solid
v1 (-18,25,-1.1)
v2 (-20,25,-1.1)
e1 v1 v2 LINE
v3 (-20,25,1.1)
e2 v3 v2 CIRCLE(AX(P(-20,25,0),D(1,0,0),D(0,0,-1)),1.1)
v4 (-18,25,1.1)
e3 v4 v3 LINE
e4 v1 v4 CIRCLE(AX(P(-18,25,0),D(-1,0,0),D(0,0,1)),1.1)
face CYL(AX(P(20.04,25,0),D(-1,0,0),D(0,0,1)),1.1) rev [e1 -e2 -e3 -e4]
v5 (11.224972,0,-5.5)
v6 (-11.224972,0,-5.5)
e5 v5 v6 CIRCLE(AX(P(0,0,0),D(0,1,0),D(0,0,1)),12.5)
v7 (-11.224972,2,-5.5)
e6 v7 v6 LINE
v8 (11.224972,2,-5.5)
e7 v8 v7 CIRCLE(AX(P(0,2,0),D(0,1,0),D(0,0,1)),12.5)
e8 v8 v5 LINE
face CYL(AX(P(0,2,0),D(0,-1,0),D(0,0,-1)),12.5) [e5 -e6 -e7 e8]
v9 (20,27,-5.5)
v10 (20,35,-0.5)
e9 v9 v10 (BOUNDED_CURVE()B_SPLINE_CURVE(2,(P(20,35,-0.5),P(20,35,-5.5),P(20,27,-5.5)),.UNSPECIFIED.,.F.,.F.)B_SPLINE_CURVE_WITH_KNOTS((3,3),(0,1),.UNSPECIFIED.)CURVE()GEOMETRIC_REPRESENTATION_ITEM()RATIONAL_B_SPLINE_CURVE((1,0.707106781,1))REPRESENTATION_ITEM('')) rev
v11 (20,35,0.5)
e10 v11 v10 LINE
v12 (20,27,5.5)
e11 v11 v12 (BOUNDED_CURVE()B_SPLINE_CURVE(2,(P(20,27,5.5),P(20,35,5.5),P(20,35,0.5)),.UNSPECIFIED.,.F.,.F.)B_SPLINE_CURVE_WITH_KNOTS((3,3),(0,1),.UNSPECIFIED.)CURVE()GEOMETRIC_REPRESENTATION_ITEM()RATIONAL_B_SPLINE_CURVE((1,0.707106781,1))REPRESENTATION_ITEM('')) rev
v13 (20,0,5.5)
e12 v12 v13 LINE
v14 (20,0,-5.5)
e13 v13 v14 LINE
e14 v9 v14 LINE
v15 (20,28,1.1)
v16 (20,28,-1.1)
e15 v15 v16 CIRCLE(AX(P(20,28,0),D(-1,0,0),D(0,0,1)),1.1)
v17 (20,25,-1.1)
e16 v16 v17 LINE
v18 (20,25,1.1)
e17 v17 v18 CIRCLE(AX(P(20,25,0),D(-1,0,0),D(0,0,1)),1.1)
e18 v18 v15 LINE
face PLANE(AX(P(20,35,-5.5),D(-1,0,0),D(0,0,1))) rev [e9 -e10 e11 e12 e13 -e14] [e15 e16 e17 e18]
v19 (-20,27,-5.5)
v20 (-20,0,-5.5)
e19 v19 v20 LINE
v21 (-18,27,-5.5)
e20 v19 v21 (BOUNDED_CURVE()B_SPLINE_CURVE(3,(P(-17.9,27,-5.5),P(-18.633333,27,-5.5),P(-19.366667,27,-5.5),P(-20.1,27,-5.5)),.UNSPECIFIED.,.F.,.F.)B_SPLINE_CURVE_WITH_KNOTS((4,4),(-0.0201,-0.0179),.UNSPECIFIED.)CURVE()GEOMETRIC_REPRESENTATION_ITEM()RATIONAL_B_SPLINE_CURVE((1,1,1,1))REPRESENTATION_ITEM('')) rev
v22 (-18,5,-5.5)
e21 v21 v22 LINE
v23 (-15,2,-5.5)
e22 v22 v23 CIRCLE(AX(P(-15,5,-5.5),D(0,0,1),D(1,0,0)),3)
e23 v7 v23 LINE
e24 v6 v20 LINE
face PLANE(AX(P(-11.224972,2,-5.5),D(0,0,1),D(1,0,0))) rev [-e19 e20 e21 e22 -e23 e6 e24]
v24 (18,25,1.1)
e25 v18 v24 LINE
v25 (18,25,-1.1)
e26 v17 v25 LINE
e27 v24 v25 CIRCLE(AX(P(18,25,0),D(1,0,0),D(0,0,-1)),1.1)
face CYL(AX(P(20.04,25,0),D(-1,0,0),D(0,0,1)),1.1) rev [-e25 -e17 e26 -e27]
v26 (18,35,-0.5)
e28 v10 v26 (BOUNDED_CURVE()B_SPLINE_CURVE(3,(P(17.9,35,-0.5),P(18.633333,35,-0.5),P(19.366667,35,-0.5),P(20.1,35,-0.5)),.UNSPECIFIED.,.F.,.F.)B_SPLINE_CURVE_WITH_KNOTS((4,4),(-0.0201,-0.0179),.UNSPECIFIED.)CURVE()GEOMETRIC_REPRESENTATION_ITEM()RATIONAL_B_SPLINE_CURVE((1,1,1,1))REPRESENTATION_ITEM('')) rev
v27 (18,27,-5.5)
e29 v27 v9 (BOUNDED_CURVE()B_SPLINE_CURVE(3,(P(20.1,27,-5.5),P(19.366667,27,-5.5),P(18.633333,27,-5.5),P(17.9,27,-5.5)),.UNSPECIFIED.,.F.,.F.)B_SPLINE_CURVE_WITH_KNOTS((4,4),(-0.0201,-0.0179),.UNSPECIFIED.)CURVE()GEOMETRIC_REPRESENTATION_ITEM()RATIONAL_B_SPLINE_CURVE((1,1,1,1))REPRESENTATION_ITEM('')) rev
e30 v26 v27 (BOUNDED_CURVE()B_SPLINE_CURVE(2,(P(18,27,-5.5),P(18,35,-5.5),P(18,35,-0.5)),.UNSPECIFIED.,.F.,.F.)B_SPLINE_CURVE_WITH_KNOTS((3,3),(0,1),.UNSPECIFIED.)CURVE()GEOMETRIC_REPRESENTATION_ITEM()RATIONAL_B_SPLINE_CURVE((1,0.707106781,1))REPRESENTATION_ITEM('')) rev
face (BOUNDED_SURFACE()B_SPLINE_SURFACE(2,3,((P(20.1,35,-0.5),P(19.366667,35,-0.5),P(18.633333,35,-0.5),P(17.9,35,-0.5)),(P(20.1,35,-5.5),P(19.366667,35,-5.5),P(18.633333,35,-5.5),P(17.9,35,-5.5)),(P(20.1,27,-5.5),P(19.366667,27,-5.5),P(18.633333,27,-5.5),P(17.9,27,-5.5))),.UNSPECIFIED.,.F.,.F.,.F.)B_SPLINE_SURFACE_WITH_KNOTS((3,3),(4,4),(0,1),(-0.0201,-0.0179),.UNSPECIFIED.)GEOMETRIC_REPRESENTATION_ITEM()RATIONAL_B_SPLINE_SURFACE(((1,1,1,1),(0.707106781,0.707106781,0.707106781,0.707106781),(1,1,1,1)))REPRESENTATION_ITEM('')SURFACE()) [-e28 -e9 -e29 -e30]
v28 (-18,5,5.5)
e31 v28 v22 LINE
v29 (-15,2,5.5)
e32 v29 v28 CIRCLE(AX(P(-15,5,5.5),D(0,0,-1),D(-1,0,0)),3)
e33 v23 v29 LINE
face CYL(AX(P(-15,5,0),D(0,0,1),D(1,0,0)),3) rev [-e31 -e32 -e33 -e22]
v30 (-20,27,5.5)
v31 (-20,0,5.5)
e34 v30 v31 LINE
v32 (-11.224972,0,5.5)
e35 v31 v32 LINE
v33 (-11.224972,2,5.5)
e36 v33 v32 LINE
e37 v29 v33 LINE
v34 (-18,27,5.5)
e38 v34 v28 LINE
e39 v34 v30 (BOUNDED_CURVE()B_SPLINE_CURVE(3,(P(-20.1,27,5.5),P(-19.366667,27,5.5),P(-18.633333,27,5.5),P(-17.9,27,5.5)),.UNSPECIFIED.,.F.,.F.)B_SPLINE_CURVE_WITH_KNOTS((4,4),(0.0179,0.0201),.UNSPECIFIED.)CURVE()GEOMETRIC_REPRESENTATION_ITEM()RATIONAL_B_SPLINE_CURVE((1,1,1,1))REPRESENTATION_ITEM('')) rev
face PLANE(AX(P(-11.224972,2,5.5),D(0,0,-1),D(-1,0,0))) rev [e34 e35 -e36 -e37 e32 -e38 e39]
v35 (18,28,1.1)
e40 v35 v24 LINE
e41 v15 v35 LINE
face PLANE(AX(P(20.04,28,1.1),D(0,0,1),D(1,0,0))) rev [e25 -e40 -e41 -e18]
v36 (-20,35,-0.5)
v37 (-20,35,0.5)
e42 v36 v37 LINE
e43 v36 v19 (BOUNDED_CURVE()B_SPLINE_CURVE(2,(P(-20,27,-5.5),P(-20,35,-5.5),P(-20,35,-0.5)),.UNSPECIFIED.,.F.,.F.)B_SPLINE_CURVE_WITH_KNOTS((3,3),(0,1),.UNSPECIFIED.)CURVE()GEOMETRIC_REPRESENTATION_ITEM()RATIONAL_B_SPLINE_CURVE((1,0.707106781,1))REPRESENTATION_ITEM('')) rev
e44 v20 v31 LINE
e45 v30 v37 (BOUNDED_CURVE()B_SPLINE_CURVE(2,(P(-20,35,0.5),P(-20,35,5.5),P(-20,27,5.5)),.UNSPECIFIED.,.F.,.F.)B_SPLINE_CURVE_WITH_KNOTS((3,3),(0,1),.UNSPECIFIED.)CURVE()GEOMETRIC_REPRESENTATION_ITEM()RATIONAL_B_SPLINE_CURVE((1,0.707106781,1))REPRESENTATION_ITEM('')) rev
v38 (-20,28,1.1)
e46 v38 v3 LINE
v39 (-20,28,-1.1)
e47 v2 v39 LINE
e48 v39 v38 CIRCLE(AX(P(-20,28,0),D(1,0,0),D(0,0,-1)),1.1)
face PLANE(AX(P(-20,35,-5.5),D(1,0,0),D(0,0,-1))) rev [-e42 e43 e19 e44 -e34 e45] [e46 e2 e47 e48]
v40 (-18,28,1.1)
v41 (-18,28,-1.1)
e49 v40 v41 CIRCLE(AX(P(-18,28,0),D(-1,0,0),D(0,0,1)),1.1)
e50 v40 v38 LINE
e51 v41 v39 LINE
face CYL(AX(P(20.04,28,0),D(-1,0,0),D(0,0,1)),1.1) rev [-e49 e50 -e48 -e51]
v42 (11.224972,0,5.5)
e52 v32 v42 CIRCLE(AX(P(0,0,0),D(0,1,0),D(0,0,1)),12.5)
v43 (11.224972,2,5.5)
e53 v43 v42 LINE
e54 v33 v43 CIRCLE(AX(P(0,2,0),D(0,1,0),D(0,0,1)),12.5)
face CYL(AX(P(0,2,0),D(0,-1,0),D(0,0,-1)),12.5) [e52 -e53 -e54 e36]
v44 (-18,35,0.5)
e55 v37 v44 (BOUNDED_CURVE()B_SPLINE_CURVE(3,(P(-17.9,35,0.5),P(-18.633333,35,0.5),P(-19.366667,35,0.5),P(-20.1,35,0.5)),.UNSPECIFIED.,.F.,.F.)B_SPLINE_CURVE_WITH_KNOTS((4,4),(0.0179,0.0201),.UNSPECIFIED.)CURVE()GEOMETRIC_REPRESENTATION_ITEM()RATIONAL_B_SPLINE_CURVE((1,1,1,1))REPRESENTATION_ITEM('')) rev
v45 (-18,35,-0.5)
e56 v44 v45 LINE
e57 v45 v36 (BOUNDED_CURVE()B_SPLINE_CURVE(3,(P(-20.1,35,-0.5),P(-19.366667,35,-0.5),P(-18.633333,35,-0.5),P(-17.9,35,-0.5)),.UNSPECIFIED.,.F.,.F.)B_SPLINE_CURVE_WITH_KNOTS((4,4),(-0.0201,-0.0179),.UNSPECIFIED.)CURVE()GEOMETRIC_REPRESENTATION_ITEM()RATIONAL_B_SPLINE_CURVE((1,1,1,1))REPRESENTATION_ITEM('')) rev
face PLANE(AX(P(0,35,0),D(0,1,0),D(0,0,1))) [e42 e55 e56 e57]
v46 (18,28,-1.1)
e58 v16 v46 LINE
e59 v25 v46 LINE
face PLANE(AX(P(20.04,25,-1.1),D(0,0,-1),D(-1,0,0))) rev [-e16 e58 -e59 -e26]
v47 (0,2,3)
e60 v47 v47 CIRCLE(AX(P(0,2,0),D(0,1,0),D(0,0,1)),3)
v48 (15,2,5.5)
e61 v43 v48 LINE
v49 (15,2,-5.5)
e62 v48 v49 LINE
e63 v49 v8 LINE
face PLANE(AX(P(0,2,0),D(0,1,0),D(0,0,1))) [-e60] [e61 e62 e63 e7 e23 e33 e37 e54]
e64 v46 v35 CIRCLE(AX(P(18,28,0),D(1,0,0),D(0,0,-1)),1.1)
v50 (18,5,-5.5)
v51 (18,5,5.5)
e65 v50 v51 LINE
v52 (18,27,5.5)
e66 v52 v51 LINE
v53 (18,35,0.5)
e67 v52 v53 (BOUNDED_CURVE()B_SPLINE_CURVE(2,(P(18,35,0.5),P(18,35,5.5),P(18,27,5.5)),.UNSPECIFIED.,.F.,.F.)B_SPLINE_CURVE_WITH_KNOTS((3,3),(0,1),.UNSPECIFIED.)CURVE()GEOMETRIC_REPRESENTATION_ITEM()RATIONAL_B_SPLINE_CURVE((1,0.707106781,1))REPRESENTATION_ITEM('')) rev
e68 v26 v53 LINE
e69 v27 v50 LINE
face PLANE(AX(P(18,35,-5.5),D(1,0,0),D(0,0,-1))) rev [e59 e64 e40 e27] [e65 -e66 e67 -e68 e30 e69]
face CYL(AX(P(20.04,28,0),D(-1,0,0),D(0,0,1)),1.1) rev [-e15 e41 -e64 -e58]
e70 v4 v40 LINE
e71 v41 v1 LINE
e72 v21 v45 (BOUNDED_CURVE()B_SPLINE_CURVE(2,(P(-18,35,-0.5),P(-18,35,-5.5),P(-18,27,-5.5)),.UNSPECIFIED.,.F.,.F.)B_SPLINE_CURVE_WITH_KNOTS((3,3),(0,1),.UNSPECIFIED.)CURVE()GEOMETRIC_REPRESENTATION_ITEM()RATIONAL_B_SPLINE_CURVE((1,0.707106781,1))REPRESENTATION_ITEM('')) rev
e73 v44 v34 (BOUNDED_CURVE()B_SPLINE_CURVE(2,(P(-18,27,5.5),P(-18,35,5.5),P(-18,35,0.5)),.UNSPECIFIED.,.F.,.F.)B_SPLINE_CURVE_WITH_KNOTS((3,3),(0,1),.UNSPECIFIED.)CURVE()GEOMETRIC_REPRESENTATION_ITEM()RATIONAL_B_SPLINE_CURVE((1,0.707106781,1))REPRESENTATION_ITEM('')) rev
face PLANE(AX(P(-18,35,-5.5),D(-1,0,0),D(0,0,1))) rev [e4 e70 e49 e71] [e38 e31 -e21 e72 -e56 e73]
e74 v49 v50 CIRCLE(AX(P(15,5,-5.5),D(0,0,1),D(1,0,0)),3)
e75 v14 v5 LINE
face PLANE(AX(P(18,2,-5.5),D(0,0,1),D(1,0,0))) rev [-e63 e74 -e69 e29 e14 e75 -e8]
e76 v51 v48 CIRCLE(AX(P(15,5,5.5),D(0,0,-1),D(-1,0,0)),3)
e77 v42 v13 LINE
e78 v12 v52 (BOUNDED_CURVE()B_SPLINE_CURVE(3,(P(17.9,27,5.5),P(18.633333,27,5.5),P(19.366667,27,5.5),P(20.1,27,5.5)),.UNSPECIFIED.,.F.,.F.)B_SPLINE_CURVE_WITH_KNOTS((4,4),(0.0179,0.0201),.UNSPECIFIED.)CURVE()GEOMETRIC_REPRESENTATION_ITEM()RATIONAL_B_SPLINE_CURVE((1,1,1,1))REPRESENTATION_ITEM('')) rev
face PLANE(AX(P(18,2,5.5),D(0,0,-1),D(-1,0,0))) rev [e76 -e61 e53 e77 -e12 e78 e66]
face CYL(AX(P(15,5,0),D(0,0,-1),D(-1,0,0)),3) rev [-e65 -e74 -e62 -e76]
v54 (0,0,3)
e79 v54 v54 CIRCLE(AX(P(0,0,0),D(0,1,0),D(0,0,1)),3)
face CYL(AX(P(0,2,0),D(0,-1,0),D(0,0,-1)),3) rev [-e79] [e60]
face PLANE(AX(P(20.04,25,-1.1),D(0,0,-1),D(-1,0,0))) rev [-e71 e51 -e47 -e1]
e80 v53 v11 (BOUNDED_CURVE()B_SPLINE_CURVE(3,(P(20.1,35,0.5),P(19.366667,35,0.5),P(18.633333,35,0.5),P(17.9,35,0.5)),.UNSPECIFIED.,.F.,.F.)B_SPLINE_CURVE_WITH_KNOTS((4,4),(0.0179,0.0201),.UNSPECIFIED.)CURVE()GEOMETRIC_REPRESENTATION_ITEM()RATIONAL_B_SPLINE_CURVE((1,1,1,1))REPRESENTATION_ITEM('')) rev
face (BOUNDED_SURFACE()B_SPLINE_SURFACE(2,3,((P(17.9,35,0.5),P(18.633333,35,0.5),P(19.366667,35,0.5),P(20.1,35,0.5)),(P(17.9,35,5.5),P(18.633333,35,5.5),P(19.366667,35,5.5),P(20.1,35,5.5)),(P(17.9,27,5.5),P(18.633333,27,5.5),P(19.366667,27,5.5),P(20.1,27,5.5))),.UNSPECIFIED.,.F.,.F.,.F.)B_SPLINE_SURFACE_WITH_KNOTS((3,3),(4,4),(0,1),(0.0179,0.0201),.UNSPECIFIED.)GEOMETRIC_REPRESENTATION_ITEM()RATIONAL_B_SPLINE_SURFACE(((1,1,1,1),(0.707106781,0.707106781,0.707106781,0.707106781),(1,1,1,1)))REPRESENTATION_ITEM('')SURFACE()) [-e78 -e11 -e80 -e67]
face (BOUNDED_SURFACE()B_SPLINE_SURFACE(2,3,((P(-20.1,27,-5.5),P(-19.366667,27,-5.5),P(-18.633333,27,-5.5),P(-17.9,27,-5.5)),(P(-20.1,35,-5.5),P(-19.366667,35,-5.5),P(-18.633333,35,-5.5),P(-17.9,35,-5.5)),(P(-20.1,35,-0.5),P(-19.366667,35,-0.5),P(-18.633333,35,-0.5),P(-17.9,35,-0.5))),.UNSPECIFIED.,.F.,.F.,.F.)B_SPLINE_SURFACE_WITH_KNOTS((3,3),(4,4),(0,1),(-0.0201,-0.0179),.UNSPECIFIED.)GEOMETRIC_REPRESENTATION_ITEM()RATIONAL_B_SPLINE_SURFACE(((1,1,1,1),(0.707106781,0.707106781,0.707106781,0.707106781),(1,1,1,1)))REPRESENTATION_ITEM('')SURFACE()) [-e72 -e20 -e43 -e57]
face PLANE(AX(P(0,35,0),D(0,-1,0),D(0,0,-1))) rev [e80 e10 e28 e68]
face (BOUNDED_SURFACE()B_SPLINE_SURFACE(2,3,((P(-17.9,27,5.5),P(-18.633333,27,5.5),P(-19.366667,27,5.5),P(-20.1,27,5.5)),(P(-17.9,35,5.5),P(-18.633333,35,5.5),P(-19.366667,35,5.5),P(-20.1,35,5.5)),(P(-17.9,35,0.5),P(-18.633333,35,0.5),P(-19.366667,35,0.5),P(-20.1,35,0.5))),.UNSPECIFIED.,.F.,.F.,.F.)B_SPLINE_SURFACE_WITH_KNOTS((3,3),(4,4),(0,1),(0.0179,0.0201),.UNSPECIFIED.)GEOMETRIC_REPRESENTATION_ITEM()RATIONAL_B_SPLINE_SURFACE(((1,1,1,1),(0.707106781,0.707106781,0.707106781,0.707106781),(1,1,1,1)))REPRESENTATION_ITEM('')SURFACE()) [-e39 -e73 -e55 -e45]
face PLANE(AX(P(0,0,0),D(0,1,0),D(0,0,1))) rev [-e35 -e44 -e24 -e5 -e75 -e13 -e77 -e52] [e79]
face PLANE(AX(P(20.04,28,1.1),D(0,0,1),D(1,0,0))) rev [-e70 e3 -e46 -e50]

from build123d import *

# Parameters (mm, degrees)
SKETCH_1_R               = 3
EXTRUDE_1_DEPTH          = 2
SKETCH_2_W               = 2
SKETCH_2_H               = 11
EXTRUDE_2_DEPTH          = 35
FILLET_1_SIZE            = 8
FILLET_1_SIZE_2          = 5
CUT_EXTRUDE_1_DEPTH      = 55.600824307
CUT_EXTRUDE_1_DEPTH_BACK = 55.600824307
FILLET_2_R               = 3


with BuildPart() as part:
    # 草图1 → 凸台-拉伸1 (new body)
    with BuildSketch(Plane(origin=(0, 0, 0), x_dir=(1, 0, 0), z_dir=(0, 1, 0))):
        with BuildLine():
            Line((-11.22497216, 5.5), (-18, 5.5))
            Line((-18, 5.5), (-18, -5.5))
            Line((-18, -5.5), (-11.22497216, -5.5))
            ThreePointArc((-11.22497216, -5.5), (0, -12.5), (11.22497216, -5.5))
            Line((11.22497216, -5.5), (18, -5.5))
            Line((18, -5.5), (18, 5.5))
            Line((18, 5.5), (11.22497216, 5.5))
            ThreePointArc((11.22497216, 5.5), (0, 12.5), (-11.22497216, 5.5))
        make_face()
        with Locations(Location((0, 0, 0), (0, 0, 270))):
            Circle(SKETCH_1_R, mode=Mode.SUBTRACT)
    extrude(amount=EXTRUDE_1_DEPTH)

    # 草图2 → 凸台-拉伸2 (add)
    with BuildSketch(Plane(origin=(0, 0, 0), x_dir=(1, 0, 0), z_dir=(0, 1, 0))):
        with Locations((-19, 0)):
            Rectangle(SKETCH_2_W, SKETCH_2_H)
        with Locations((19, 0)):
            Rectangle(SKETCH_2_W, SKETCH_2_H)
    extrude(amount=EXTRUDE_2_DEPTH)

    # 圆角1
    # an asymmetric fillet: 8, 5 mm, written as the material it takes off along each edge
    with BuildSketch(Plane(origin=(40, 35, -5.5), x_dir=(0, -1, 0), z_dir=(-1, 0, 0)), Plane(origin=(2, 35, -5.5), x_dir=(0, -1, 0), z_dir=(-1, 0, 0)), Plane(origin=(-40, 35, 5.5), x_dir=(0, -1, 0), z_dir=(1, 0, 0))) as fillet_1_piece_1:
        with BuildLine():
            Bezier((FILLET_1_SIZE, 0), (0, 0), (0, FILLET_1_SIZE_2), weights=[1, 0.707106781, 1])
            Line((0, FILLET_1_SIZE_2), (0, 0))
            Line((0, 0), (FILLET_1_SIZE, 0))
        make_face()
    extrude(amount=42, mode=Mode.SUBTRACT)
    with BuildSketch(Plane(origin=(-2, 35, 5.5), x_dir=(0, 0, -1), z_dir=(1, 0, 0))) as fillet_1_piece_2:
        with BuildLine():
            Bezier((FILLET_1_SIZE_2, 0), (0, 0), (0, -FILLET_1_SIZE), weights=[1, 0.707106781, 1])
            Line((0, -FILLET_1_SIZE), (0, 0))
            Line((0, 0), (FILLET_1_SIZE_2, 0))
        make_face()
    extrude(amount=42, mode=Mode.SUBTRACT)

    # 草图3 → 切除-拉伸1 (cut, two sides: drawn at the far end of the back side and taken through both)
    with BuildSketch(Plane.ZY.offset(20).offset(-CUT_EXTRUDE_1_DEPTH_BACK)):
        with BuildLine():
            Line((1.1, 28), (1.1, 25))
            ThreePointArc((1.1, 25), (0, 23.9), (-1.1, 25))
            Line((-1.1, 25), (-1.1, 28))
            ThreePointArc((-1.1, 28), (0, 29.1), (1.1, 28))
        make_face()
    extrude(amount=CUT_EXTRUDE_1_DEPTH + CUT_EXTRUDE_1_DEPTH_BACK, mode=Mode.SUBTRACT)

    # 圆角2
    fillet_2_edges = [part.edges().sort_by_distance(p)[0] for p in [
        (18, 2, 0),
        (-18, 2, 0),
    ]]
    fillet(fillet_2_edges, radius=FILLET_2_R)


solid = part.part
